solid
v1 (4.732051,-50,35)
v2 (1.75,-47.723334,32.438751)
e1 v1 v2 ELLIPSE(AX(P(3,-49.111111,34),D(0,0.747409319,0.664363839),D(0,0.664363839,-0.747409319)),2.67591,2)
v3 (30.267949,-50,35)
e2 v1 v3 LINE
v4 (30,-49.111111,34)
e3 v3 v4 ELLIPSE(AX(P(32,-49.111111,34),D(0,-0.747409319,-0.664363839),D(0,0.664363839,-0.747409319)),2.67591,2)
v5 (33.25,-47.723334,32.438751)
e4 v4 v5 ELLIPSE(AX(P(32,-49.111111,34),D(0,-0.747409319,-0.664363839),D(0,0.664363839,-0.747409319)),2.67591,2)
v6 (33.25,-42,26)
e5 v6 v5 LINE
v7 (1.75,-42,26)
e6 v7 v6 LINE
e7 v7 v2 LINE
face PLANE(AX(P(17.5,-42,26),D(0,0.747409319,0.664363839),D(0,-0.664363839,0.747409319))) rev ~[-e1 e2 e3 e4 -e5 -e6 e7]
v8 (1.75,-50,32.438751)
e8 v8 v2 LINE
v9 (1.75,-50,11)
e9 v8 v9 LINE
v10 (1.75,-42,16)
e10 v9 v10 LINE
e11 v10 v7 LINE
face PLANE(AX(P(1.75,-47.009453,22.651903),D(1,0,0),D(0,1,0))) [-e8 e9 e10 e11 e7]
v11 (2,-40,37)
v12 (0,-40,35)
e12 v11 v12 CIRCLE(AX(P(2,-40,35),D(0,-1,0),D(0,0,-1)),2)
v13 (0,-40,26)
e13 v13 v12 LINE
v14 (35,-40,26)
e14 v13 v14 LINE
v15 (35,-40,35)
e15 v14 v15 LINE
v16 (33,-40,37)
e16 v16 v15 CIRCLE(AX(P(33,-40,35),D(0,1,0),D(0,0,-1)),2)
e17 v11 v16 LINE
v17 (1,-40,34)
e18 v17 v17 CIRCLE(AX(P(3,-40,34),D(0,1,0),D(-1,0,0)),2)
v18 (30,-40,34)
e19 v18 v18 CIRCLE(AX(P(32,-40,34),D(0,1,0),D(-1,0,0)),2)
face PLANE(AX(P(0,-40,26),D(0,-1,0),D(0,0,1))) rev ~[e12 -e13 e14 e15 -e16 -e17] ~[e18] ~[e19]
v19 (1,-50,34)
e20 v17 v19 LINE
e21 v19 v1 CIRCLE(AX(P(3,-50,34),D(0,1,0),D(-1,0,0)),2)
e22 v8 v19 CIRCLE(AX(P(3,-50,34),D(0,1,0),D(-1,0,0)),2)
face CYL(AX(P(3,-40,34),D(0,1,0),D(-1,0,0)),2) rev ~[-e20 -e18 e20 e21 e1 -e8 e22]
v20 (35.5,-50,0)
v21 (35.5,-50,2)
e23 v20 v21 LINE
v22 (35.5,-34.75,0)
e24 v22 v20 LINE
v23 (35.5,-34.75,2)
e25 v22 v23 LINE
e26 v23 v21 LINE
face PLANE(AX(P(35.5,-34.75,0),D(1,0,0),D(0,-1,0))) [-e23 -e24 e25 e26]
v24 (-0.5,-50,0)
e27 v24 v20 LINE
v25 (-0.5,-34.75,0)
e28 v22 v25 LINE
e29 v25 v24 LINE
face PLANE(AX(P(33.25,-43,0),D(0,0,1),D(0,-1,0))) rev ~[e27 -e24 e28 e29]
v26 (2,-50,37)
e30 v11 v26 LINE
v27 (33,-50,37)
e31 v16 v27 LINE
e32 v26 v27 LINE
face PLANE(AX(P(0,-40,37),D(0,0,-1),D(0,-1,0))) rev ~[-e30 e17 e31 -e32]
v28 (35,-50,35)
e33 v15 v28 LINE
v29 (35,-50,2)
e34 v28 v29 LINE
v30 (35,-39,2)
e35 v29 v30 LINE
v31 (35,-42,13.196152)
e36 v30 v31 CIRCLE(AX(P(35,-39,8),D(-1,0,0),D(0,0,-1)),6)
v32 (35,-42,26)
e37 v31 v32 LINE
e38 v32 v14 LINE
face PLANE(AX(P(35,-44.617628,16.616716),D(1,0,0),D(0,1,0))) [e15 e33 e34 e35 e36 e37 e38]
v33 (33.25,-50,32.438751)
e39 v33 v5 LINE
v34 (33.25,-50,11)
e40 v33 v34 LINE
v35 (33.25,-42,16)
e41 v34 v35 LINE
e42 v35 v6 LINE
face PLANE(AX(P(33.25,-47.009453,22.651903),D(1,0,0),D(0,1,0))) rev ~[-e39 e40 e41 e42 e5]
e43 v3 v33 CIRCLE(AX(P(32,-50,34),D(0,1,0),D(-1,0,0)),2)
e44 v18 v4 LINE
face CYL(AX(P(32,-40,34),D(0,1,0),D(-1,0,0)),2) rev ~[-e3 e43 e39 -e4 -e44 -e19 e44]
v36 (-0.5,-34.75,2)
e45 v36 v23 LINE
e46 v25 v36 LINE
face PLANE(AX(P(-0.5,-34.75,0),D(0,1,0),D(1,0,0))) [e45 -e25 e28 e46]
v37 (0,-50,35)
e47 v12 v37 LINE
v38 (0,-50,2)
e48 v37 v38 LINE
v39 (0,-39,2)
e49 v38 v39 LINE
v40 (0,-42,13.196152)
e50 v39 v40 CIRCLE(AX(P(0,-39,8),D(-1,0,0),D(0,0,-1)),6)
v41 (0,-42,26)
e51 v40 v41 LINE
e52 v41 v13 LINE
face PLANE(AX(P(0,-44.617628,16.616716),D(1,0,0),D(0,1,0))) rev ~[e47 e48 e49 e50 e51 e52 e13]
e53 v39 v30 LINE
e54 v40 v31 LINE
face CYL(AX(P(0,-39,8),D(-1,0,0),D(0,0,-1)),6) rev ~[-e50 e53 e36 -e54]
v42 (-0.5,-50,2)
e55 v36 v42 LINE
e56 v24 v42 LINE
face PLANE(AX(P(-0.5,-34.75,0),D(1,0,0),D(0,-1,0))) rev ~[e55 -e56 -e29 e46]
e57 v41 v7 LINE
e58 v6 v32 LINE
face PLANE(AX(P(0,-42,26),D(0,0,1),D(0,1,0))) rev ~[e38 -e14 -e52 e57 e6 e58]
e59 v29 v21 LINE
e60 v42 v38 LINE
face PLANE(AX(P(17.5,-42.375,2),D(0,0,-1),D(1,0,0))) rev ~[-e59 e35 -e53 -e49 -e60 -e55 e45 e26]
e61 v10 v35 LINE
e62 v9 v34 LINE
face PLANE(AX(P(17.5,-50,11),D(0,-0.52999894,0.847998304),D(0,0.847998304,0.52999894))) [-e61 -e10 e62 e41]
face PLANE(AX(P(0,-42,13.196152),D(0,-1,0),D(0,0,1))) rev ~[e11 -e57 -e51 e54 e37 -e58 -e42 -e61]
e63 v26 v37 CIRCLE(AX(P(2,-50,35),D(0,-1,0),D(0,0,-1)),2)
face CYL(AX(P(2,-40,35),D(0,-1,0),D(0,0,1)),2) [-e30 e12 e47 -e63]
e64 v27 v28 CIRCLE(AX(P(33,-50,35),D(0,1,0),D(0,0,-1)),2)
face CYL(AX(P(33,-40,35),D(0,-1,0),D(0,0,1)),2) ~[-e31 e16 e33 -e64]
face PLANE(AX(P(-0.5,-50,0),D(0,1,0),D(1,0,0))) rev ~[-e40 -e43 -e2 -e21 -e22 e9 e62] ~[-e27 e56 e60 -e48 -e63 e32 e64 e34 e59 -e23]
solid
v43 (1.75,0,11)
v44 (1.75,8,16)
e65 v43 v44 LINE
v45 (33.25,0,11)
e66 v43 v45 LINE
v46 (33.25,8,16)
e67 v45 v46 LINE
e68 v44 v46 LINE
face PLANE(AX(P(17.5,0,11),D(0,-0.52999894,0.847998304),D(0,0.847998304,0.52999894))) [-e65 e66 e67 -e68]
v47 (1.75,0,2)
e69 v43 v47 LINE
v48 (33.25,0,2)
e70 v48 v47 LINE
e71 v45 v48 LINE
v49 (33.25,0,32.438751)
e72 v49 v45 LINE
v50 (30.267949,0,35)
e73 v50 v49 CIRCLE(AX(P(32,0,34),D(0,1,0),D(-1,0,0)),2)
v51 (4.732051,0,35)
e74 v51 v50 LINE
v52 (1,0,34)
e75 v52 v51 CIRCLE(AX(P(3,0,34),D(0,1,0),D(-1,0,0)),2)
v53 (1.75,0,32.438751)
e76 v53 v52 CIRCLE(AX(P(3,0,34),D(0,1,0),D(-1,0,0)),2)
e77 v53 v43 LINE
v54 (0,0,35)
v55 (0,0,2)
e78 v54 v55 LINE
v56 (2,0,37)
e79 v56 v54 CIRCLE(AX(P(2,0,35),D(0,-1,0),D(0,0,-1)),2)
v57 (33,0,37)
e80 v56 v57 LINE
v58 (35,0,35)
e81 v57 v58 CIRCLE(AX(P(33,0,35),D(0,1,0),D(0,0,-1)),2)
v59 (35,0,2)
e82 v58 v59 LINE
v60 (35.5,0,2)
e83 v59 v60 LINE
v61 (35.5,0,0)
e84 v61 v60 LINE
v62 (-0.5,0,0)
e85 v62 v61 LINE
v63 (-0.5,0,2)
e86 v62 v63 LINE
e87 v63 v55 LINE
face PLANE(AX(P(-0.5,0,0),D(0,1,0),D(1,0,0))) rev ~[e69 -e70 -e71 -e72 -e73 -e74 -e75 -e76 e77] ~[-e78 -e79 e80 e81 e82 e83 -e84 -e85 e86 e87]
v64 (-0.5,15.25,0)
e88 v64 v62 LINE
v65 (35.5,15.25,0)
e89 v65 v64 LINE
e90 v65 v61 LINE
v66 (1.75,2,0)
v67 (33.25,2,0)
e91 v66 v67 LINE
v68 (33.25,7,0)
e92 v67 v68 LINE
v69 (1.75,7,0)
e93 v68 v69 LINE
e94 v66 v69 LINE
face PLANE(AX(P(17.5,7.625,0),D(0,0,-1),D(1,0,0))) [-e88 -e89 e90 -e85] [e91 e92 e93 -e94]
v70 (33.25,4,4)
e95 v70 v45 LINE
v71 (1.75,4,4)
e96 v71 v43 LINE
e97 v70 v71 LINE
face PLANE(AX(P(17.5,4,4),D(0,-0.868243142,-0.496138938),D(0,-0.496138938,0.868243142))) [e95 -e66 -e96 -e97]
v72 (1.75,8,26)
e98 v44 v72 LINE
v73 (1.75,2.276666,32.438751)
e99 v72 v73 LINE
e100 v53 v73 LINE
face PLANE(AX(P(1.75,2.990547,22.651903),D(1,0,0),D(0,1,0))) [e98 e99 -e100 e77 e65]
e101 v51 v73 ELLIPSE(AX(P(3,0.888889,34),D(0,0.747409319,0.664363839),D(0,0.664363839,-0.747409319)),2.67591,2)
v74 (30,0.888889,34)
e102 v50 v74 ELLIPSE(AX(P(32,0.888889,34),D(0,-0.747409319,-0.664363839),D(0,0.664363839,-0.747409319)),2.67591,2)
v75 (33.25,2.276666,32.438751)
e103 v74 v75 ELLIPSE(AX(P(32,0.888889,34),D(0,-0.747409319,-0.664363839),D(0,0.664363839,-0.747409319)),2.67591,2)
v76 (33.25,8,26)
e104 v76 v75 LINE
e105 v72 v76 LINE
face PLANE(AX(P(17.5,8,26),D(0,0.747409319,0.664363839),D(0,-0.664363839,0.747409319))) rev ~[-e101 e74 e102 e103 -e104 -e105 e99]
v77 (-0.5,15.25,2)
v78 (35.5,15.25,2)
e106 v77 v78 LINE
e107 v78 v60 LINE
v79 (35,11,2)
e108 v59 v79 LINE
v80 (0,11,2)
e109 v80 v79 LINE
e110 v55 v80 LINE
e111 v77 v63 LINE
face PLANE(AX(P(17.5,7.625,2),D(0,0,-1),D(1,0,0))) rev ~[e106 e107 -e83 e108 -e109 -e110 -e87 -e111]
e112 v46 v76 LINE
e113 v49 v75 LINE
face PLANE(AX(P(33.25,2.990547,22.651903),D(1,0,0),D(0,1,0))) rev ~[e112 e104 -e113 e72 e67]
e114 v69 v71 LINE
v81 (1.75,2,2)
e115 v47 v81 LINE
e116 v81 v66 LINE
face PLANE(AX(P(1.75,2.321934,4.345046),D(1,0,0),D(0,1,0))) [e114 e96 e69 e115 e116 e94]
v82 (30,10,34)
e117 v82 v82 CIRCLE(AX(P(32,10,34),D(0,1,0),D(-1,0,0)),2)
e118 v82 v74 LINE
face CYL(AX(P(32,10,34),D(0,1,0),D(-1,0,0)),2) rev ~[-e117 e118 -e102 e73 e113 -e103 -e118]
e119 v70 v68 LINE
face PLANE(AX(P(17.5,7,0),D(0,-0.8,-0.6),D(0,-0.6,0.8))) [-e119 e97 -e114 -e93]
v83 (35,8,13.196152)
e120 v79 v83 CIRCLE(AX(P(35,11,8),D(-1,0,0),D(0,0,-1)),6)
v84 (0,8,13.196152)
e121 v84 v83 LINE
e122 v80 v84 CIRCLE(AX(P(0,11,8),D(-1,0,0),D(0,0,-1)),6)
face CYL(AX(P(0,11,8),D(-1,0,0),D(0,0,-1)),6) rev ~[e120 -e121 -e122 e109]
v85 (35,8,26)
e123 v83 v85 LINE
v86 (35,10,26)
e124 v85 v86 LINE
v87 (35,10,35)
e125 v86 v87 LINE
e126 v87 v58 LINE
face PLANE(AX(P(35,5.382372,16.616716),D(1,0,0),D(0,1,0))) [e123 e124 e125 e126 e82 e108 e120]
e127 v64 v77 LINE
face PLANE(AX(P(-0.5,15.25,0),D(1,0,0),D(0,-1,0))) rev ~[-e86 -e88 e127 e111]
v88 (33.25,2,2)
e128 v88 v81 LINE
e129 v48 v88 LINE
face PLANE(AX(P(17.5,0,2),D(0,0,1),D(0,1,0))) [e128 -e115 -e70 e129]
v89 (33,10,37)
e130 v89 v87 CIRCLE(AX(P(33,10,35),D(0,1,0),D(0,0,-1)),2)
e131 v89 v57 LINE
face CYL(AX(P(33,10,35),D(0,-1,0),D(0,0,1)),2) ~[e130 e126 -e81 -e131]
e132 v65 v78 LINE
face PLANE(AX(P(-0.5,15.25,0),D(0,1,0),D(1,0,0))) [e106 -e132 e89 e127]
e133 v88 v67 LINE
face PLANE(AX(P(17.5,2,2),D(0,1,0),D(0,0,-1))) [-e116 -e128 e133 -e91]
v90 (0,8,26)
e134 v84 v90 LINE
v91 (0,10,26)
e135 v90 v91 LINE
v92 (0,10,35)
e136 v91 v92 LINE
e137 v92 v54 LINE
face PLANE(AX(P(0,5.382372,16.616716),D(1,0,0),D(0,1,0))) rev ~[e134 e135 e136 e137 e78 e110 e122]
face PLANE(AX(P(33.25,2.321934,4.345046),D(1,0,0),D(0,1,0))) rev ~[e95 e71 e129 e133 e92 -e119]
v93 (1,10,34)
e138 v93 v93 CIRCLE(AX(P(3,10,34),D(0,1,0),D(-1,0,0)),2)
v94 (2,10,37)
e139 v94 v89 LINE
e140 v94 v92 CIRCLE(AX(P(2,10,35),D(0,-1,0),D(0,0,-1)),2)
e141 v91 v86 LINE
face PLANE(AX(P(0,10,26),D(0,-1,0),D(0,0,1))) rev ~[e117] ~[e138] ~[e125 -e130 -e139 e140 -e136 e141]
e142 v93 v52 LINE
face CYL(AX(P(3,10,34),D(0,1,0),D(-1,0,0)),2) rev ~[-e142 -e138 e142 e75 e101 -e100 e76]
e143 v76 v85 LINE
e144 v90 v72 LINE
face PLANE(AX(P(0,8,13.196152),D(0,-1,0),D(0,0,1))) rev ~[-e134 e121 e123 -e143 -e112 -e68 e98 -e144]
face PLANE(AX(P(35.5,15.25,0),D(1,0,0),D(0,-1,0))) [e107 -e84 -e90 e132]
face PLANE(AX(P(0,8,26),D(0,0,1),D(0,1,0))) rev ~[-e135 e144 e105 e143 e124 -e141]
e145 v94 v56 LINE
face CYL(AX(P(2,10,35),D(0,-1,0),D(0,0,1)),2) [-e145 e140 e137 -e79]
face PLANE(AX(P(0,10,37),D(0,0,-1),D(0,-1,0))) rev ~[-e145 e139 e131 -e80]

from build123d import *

# Parameters (mm, degrees)
F1_DEPTH      = 35
F2_R          = 2
F3_DEPTH      = 10
F4_R          = 2
F7_DEPTH      = 15.75
F7_DEPTH_BACK = 15.75
F8_W          = 36
F8_H          = 15.25
F8_W_2        = 31.5
F8_H_2        = 5
F9_DEPTH      = 2
F12_DEPTH     = 31.5


with BuildPart() as f1:
    # F0 (on Right) → F1 (new body)
    with BuildSketch(Plane.YZ):
        with BuildLine():
            Line((0, 37), (0, 0))
            Line((0, 0), (15.25, 0))
            Line((15.25, 0), (15.25, 2))
            Line((15.25, 2), (11, 2))
            ThreePointArc((11, 2), (5.2044450423, 6.4470857294), (8, 13.1961524227))
            Line((8, 13.1961524227), (8, 26))
            Line((8, 26), (10, 26))
            Line((10, 26), (10, 37))
            Line((10, 37), (0, 37))
        make_face()
    extrude(amount=F1_DEPTH)

    # F2 (on face) → F3 (cut, through all)
    with BuildSketch(Plane(origin=(0, 10, 0), x_dir=(-1, 0, 0), z_dir=(0, 1, 0))):
        with Locations((-32, 34)):
            Circle(F2_R)
        with Locations((-3, 34)):
            Circle(F2_R)
    extrude(amount=-F3_DEPTH, mode=Mode.SUBTRACT)

    # F4
    f4_edges = [f1.edges().sort_by_distance(p)[0] for p in [
        (0, 5, 37),
        (35, 5, 37),
    ]]
    fillet(f4_edges, radius=F4_R)

    # F6 (on offset) → F7 (cut, two sides)
    with BuildSketch(Plane.YZ.offset(17.5)) as f7_sk:
        Polygon((4, 4), (0, 11), (0, 2), (2, 2), (2, 0), (7, 0), align=None)
        Polygon((8, 26), (0, 35), (0, 11), (8, 16), align=None)
    extrude(amount=F7_DEPTH, mode=Mode.SUBTRACT)
    extrude(f7_sk.sketch, amount=-F7_DEPTH_BACK, mode=Mode.SUBTRACT)

    # F8 (on face) → F9 (join)
    with BuildSketch(Plane(origin=(0, 0, 0), x_dir=(1, 0, 0), z_dir=(0, 0, -1))):
        with Locations((17.5, -7.625)):
            Rectangle(F8_W, F8_H)
        with Locations((17.5, -4.5)):
            Rectangle(F8_W_2, F8_H_2, mode=Mode.SUBTRACT)
    extrude(amount=-F9_DEPTH)


with BuildPart() as f10_1:
    # F10: copy of F1
    add(f1.part.moved(Location((0, -50, 0))))

    # F11 (on face) → F12 (join, through all)
    with BuildSketch(Plane(origin=(33.25, 0, 0), x_dir=(0, -1, 0), z_dir=(-1, 0, 0))):
        Polygon((50, 11), (46, 4), (43, 0), (48, 0), (48, 2), (50, 2), align=None)
    extrude(amount=F12_DEPTH)


solid = Compound([f1.part, f10_1.part])
